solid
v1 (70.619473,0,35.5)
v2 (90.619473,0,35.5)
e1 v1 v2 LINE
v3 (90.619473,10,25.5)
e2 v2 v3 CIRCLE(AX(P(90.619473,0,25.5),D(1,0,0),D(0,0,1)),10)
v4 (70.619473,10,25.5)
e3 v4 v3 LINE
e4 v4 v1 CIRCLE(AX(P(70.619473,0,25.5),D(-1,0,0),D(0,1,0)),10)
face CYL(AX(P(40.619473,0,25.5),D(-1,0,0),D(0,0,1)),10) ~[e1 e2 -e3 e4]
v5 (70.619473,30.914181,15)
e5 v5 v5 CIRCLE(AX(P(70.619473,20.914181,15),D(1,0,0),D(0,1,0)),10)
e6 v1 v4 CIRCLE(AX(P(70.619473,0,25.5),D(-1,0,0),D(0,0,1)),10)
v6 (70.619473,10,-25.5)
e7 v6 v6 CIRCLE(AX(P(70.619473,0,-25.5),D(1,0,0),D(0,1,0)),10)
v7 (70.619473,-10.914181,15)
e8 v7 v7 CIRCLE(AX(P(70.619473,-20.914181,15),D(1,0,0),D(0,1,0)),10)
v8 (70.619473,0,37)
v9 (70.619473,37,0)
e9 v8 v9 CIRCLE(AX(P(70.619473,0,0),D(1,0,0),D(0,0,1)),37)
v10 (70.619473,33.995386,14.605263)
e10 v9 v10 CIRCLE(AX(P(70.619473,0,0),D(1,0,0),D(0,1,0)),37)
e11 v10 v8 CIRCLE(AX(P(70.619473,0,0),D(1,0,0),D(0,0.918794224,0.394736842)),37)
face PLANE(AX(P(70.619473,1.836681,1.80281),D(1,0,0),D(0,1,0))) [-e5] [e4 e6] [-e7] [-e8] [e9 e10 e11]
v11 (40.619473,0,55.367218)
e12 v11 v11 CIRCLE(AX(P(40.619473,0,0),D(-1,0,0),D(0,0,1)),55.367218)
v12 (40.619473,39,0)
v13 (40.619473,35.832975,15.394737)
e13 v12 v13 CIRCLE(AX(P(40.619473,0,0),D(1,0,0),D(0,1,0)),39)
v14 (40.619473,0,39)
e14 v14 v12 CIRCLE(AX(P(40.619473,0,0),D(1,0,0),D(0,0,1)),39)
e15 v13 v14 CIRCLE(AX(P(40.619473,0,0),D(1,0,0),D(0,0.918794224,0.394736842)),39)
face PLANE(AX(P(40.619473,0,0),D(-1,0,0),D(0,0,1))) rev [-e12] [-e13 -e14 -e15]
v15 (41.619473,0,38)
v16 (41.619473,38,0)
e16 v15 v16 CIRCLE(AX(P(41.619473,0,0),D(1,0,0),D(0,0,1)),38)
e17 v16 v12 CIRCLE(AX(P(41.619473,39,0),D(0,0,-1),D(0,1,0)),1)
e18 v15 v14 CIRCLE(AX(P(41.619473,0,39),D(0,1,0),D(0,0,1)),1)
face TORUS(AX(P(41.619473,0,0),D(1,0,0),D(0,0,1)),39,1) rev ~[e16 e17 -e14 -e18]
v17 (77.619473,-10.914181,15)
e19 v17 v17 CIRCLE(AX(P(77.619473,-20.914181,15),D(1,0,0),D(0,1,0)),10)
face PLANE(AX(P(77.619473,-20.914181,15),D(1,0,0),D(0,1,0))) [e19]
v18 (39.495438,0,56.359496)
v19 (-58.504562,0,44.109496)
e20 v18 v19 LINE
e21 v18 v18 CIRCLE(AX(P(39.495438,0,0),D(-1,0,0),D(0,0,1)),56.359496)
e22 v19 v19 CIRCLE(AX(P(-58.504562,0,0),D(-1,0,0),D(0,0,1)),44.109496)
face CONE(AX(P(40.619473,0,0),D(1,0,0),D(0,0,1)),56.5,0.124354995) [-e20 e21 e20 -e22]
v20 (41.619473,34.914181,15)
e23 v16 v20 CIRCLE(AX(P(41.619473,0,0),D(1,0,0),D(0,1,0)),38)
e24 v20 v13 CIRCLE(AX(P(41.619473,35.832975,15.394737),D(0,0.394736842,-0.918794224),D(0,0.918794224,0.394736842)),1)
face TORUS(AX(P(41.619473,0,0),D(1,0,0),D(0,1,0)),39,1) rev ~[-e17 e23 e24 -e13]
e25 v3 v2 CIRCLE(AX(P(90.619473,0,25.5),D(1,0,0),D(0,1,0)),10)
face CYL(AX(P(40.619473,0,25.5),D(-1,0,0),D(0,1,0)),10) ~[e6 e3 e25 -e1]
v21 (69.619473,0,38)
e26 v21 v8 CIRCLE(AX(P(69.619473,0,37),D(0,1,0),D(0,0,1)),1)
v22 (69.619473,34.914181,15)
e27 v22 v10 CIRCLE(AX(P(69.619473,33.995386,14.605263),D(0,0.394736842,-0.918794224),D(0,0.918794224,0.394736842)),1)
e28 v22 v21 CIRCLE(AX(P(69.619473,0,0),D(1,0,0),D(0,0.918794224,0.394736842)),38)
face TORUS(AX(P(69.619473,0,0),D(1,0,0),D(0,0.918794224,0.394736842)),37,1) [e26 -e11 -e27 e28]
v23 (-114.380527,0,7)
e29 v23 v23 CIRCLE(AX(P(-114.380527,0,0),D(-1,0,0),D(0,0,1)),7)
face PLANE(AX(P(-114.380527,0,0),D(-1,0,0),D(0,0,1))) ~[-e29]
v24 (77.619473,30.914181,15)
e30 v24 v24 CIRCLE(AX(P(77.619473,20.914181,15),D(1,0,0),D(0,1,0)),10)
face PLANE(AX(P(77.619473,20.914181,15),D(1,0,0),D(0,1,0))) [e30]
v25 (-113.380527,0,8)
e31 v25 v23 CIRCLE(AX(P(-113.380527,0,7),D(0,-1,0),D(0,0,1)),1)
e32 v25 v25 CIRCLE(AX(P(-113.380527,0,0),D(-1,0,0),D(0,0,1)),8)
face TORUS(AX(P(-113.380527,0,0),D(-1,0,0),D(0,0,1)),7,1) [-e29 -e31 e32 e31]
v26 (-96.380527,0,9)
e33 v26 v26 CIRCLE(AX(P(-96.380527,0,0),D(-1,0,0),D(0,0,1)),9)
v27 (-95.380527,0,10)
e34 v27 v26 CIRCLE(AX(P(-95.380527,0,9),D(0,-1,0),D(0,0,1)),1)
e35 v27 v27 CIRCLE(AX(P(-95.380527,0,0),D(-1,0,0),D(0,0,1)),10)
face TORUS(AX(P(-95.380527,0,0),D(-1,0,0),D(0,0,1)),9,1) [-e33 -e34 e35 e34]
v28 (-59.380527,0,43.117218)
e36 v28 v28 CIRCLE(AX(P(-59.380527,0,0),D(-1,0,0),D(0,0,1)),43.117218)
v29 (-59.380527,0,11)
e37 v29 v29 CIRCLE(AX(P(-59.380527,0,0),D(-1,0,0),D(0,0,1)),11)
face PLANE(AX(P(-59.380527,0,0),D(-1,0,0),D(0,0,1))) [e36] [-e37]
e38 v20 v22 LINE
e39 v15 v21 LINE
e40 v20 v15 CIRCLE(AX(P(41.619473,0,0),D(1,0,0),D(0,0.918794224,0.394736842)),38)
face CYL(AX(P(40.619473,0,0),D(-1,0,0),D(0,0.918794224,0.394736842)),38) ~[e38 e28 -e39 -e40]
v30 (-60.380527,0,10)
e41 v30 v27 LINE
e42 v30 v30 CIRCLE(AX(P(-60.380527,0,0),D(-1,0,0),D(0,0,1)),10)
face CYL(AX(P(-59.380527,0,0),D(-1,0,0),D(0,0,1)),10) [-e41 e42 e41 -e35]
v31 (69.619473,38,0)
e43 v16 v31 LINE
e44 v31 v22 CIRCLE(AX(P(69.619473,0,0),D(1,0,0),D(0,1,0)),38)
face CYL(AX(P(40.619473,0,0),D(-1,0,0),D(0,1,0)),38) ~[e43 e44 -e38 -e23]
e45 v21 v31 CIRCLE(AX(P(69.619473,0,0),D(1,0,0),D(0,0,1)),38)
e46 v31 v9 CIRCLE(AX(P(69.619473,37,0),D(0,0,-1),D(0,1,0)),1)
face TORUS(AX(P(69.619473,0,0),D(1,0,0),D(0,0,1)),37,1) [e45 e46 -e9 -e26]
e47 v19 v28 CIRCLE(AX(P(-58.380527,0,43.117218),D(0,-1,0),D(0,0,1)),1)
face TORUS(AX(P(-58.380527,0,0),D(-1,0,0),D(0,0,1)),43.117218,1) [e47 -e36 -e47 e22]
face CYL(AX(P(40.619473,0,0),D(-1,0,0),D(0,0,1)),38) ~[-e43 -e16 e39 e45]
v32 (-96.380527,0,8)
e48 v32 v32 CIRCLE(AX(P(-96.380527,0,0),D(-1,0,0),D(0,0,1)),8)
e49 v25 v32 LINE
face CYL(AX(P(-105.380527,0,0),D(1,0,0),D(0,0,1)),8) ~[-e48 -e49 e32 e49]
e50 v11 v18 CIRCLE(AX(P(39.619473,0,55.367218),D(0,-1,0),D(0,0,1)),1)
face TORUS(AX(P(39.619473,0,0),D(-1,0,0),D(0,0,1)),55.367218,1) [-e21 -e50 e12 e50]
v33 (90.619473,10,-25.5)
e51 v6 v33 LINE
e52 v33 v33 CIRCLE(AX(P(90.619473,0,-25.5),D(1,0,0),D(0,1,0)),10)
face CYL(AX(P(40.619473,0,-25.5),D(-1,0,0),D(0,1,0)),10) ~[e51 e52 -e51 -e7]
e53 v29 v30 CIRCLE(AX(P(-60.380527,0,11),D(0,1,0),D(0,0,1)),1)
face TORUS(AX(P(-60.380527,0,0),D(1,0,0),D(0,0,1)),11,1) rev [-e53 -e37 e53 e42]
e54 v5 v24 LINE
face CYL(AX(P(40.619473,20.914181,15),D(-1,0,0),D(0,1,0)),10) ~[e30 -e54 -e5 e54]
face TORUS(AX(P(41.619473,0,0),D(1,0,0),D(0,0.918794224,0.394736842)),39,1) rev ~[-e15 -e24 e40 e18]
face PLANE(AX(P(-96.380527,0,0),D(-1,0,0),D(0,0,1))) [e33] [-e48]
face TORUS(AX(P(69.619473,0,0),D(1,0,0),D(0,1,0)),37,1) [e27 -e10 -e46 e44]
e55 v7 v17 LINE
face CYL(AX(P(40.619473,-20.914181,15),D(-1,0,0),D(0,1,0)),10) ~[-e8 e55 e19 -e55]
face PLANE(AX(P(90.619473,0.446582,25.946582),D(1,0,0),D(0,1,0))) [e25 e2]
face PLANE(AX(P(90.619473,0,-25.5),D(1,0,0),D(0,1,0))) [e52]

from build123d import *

# Parameters (mm, degrees)
F0_W     = 18
F0_H     = 8
F2_R     = 10
F3_DEPTH = 37
F4_DEPTH = 50
F5_DEPTH = 30
F6_R     = 1
F7_R     = 1


with BuildPart() as f1:
    # F0 (on Front) → F1 (revolve)
    with BuildSketch(Plane.XZ):
        with Locations((-105.3805270673, 4)):
            Rectangle(F0_W, F0_H)
        Polygon((-96.3805270673, 8), (-96.3805270673, 0), (-59.3805270673, 0), (-59.3805270673, 10), (-96.3805270673, 10), align=None)
        Polygon((-59.3805270673, 10), (-59.3805270673, 0), (40.6194729327, 0), (40.6194729327, 56.5), (-59.3805270673, 44), align=None)
    revolve(axis=Axis((8.274338072, 0, 0), (-1, 0, 0)))

    # F2 (on face) → F3 (join)
    with BuildSketch(Plane.YZ.offset(40.6194729327)):
        with Locations((-20.9141805002, 15)):
            Circle(F2_R)
        with Locations((20.9141805002, 15)):
            Circle(F2_R)
    extrude(amount=F3_DEPTH)

    # F2 (on face) → F4 (join)
    with BuildSketch(Plane.YZ.offset(40.6194729327)):
        with BuildLine():
            ThreePointArc((10, 25.5), (7.0710678119, 32.5710678119), (0, 35.5))
            ThreePointArc((0, 35.5), (-7.0710678119, 18.4289321881), (10, 25.5))
        make_face()
        with Locations((0, -25.5)):
            Circle(F2_R)
    extrude(amount=F4_DEPTH)

    # F2 (on face) → F5 (join)
    with BuildSketch(Plane.YZ.offset(40.6194729327)):
        with BuildLine():
            ThreePointArc((0, 38), (-26.8700576851, -26.8700576851), (38, 0))
            ThreePointArc((38, 0), (37.2205511714, 7.6570601732), (34.9141805002, 15))
            ThreePointArc((34.9141805002, 15), (20.9045449604, 31.7332633052), (0, 38))
        make_face()
        with Locations((0, -25.5)):
            Circle(F2_R, mode=Mode.SUBTRACT)
        with Locations((-20.9141805002, 15)):
            Circle(F2_R, mode=Mode.SUBTRACT)
        with BuildLine():
            ThreePointArc((10, 25.5), (-7.0710678119, 18.4289321881), (0, 35.5))
            ThreePointArc((0, 35.5), (7.0710678119, 32.5710678119), (10, 25.5))
        make_face(mode=Mode.SUBTRACT)
        with Locations((20.9141805002, 15)):
            Circle(F2_R, mode=Mode.SUBTRACT)
    extrude(amount=F5_DEPTH)

    # F6
    f6_edges = [f1.edges().sort_by_distance(p)[0] for p in [
        (-59.380527, 0, -44),
        (40.619473, 0, -56.5),
        (-96.380527, 0, -10),
        (-114.380527, 0, -8),
        (70.619473, -38, 0),
    ]]
    fillet(f6_edges, radius=F6_R)

    # F7
    f7_edges = [f1.edges().sort_by_distance(p)[0] for p in [
        (40.619473, -38, 0),
        (-59.380527, 0, -43.117218),
        (-59.380527, 0, -10),
    ]]
    fillet(f7_edges, radius=F7_R)


solid = f1.part
